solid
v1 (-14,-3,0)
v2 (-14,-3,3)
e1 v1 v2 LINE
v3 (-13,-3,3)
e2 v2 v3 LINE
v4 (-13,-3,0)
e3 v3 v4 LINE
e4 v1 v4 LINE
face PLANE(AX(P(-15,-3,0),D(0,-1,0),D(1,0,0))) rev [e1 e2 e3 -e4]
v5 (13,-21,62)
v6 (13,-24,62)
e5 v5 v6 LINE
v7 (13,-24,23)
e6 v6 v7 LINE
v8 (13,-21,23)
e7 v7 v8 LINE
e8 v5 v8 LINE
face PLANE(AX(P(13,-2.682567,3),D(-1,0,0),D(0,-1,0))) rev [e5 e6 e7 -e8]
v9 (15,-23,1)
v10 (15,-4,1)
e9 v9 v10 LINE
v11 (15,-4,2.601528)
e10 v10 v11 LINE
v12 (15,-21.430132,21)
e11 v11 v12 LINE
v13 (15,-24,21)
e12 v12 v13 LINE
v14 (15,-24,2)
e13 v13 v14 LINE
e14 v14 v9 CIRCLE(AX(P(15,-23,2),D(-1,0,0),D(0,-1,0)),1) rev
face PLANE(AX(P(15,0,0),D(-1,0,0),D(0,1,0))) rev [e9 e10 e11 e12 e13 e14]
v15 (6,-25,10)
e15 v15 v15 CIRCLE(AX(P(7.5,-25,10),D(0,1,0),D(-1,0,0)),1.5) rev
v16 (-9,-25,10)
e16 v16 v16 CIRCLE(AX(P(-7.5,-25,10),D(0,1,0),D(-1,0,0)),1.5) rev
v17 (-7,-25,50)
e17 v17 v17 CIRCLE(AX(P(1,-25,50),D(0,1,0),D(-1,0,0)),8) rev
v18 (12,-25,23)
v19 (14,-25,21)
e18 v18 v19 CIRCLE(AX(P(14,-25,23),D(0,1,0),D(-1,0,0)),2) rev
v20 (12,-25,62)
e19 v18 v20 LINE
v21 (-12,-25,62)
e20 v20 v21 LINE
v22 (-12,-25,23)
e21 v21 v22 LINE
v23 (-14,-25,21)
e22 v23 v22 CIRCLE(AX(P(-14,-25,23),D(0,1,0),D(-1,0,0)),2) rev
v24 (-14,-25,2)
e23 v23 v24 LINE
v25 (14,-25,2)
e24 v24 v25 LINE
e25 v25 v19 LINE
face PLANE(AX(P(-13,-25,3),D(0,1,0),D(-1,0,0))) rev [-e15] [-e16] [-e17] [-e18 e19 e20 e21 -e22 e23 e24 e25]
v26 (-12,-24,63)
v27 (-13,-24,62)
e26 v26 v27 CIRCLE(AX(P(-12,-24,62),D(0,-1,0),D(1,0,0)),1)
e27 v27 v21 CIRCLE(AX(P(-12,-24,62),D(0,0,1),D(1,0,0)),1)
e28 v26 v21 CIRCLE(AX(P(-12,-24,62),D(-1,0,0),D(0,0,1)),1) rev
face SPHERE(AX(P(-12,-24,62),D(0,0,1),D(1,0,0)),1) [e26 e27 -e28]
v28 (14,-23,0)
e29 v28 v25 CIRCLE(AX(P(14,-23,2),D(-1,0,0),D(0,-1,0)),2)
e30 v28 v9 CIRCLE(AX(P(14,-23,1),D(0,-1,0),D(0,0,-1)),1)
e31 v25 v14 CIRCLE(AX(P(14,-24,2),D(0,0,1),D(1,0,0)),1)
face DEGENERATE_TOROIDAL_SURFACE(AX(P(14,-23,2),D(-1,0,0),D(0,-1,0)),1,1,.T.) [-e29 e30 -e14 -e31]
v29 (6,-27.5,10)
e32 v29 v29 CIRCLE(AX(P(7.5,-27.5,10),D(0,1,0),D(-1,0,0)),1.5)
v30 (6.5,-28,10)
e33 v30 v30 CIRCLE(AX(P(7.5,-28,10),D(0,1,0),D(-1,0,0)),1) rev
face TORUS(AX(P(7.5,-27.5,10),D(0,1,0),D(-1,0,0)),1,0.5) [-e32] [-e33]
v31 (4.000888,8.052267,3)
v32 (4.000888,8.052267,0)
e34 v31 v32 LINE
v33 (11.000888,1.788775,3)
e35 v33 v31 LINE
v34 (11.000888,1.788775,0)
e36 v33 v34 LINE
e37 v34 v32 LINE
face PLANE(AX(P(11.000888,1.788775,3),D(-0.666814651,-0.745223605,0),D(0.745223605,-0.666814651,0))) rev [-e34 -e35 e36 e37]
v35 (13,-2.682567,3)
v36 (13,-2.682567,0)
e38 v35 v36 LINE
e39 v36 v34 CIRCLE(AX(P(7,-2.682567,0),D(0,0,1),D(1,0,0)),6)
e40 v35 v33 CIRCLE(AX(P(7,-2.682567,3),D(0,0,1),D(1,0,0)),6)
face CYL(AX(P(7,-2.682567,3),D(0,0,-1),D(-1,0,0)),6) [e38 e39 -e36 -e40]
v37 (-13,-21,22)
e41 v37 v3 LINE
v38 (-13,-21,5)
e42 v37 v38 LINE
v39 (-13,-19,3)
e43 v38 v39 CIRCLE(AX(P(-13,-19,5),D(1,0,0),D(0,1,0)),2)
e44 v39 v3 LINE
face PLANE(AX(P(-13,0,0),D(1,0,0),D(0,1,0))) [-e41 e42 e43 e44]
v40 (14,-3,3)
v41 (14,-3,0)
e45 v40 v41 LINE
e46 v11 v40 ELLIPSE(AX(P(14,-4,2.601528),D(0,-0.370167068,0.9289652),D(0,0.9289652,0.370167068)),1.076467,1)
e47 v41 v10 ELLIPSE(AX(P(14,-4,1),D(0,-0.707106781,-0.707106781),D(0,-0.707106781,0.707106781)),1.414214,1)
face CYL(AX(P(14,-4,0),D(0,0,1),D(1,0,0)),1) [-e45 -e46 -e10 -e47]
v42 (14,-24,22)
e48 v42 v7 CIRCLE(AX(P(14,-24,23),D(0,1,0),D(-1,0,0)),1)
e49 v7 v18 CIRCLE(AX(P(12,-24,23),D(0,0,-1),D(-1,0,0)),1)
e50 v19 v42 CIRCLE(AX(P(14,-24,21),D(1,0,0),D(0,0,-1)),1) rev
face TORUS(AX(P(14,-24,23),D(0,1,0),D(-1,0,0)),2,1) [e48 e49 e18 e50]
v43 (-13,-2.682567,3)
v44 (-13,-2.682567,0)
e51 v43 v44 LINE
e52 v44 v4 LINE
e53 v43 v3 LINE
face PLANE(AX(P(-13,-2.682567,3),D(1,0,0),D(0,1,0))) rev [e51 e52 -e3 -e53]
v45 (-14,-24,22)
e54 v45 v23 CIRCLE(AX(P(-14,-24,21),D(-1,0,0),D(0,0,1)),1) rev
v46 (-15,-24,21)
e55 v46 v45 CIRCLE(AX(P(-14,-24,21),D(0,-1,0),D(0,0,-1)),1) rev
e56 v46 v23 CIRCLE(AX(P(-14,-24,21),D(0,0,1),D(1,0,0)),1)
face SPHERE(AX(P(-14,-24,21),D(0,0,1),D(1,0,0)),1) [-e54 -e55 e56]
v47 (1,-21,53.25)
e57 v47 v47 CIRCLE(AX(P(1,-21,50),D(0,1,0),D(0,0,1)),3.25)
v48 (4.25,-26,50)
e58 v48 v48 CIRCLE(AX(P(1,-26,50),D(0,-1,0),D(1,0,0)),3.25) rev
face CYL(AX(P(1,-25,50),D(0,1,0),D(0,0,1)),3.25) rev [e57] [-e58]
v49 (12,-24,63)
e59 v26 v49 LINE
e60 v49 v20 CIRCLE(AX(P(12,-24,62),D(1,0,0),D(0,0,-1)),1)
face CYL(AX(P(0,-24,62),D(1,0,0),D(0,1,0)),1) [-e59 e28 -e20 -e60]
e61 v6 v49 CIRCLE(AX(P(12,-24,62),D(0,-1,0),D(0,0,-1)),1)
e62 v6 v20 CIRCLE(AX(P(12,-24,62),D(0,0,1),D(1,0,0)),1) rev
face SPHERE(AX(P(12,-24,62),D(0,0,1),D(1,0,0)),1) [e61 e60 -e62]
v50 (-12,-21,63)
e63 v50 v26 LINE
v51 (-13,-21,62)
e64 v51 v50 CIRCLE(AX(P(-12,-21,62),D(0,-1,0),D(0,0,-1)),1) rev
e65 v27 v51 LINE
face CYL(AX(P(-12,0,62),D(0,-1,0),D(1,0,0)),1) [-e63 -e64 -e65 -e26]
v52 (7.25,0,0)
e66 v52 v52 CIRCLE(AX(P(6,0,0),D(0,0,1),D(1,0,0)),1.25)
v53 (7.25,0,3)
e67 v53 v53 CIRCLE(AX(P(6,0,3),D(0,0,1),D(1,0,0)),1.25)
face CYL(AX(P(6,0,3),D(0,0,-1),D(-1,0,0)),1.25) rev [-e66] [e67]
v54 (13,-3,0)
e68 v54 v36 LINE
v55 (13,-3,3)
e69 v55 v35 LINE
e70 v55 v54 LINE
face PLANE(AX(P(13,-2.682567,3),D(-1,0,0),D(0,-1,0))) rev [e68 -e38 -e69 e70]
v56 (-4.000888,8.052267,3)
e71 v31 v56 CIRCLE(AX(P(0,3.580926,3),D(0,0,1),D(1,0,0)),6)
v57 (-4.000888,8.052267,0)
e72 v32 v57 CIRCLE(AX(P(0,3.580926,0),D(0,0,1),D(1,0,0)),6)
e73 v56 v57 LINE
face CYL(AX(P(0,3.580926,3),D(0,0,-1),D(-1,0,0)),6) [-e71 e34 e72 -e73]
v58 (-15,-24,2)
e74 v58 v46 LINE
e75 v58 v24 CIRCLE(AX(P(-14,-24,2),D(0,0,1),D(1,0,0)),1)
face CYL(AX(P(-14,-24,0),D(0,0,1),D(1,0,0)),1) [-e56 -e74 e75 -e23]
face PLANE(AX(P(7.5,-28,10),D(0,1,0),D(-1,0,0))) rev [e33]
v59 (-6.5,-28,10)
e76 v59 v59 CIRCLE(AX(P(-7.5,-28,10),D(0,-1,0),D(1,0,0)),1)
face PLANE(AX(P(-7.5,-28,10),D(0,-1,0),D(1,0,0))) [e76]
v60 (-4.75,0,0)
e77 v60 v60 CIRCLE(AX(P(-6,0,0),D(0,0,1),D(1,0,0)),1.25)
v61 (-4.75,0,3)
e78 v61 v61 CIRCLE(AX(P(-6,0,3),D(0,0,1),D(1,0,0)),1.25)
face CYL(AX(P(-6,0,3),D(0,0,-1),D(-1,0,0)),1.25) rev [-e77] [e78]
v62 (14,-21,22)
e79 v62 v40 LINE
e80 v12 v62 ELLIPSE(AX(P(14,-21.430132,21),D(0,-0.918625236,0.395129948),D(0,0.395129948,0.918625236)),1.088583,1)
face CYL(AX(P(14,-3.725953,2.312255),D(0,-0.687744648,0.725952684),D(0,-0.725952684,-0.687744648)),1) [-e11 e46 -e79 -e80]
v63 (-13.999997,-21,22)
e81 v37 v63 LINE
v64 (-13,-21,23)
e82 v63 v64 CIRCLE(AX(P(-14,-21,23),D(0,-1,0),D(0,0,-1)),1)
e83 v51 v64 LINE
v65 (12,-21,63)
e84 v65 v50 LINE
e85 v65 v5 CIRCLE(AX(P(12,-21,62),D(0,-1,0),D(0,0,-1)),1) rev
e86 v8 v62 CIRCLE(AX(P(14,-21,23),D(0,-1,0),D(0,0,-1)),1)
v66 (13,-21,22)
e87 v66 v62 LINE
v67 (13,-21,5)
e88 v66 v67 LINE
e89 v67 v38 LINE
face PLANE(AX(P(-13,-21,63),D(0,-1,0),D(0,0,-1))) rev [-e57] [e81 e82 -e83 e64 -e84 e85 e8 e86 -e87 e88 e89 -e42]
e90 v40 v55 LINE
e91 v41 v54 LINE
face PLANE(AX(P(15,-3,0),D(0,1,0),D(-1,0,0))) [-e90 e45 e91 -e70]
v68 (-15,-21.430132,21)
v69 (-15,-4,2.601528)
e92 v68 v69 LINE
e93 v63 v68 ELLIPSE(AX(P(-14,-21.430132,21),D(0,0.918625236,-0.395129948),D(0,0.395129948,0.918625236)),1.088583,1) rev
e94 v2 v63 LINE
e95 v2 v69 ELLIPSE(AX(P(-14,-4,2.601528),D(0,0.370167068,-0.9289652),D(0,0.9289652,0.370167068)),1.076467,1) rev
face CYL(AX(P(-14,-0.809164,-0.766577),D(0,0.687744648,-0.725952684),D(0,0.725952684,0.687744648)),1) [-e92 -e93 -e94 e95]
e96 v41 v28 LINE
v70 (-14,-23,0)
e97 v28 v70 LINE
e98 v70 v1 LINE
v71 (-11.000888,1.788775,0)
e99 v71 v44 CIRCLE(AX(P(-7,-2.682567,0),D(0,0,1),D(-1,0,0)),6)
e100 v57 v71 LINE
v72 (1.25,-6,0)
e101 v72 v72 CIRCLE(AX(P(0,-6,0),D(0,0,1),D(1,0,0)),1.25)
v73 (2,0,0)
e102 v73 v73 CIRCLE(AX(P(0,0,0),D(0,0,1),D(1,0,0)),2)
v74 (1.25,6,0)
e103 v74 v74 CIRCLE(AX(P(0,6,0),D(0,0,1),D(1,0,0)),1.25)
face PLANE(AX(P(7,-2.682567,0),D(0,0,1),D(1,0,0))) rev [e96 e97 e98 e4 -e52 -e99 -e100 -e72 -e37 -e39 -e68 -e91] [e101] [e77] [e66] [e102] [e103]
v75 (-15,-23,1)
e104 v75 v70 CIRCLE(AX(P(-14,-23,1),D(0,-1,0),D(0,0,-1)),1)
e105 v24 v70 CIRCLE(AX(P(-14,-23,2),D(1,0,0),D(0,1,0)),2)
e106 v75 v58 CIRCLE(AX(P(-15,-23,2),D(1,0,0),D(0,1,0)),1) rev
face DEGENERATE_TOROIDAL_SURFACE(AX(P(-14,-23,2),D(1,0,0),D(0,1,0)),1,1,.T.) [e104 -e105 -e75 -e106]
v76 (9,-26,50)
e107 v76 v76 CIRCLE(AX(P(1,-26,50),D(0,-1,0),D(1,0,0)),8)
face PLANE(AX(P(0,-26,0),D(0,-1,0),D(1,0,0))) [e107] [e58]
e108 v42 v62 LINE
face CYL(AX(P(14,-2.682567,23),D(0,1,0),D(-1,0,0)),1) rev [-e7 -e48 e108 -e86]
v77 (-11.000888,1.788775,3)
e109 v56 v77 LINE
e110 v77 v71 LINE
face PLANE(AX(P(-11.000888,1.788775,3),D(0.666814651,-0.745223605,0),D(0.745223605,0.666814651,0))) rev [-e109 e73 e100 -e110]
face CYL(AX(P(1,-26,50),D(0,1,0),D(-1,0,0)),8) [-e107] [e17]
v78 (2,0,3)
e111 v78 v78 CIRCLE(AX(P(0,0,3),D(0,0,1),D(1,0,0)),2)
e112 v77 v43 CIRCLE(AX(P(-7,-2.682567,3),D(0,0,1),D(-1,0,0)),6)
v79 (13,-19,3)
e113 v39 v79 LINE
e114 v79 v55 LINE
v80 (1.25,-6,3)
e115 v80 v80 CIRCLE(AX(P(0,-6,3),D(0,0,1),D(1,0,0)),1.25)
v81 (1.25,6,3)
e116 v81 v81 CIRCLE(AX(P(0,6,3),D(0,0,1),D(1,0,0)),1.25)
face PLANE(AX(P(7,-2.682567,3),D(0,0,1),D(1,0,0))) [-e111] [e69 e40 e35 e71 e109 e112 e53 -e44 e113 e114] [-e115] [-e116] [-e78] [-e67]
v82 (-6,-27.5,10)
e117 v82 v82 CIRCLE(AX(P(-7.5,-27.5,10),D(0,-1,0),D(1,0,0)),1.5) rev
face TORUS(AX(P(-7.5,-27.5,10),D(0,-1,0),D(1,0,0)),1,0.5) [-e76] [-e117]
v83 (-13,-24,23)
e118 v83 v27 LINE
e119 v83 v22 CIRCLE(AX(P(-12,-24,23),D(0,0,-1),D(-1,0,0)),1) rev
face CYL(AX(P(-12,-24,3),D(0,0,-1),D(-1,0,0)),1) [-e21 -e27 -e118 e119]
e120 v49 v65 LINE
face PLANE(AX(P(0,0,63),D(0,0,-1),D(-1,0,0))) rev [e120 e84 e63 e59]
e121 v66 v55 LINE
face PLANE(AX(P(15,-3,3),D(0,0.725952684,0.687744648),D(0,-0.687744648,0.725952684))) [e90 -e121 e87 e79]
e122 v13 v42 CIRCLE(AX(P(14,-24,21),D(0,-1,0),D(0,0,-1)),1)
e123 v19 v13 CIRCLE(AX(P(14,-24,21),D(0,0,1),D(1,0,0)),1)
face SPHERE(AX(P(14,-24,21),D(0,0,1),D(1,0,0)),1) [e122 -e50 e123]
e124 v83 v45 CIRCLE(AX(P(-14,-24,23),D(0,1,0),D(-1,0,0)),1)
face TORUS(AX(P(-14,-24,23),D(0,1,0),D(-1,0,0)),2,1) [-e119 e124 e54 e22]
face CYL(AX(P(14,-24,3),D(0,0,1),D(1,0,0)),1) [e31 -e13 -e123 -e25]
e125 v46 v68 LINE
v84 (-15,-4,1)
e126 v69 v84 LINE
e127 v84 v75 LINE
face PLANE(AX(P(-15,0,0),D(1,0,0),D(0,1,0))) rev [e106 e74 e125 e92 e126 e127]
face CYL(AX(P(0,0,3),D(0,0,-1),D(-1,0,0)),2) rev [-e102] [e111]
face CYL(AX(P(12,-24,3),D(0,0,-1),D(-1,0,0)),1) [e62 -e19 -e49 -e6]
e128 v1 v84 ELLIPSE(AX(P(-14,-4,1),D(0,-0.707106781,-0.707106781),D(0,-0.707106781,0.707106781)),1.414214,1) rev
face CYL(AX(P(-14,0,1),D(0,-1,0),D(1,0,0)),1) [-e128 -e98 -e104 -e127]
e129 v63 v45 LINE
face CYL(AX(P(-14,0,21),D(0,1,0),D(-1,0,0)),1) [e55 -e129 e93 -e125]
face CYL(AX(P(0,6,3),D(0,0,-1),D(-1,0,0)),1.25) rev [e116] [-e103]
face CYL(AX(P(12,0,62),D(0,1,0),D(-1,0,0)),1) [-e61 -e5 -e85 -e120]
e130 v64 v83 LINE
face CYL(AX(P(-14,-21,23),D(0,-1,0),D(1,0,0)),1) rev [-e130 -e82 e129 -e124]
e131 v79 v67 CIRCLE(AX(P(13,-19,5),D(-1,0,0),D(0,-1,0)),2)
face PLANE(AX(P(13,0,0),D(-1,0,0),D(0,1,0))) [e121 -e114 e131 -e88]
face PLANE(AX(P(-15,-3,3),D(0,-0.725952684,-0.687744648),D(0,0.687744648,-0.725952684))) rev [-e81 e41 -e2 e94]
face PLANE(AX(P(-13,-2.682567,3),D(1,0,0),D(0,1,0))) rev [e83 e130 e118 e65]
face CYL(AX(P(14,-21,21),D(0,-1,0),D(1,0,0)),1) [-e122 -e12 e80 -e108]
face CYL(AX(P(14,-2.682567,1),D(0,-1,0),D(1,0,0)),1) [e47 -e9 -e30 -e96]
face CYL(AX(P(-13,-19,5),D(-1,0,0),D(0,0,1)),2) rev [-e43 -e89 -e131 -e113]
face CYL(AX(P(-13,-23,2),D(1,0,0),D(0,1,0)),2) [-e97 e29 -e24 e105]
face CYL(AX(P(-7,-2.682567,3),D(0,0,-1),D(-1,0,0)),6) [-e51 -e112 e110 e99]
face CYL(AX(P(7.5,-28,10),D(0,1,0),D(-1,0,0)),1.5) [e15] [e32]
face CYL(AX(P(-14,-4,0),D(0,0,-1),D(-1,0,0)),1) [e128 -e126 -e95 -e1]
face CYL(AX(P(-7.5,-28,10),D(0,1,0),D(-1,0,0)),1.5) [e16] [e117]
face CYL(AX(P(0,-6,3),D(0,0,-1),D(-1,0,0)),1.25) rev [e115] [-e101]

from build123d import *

# Parameters (mm, degrees)
SKETCH1_R           = 2
SKETCH1_R_2         = 1.25
BOSS_EXTRUDE1_DEPTH = 3
SKETCH2_W           = 26
SKETCH2_H           = 4
BOSS_EXTRUDE2_DEPTH = 60
SKETCH3_R           = 3.25
CUT_EXTRUDE1_DEPTH  = 72.226350639
SKETCH4_R           = 8
SKETCH4_R_2         = 3.25
BOSS_EXTRUDE3_DEPTH = 1
SKETCH5_R           = 1.5
BOSS_EXTRUDE4_DEPTH = 3
BOSS_EXTRUDE5_DEPTH = 2
FILLET1_R           = 2
FILLET2_R           = 1
FILLET3_R           = 0.5


# Some blends are built 0.0001 mm under size
with BuildPart() as part:
    # Sketch1 → Boss-Extrude1 (new body)
    with BuildSketch(Plane.XY):
        with BuildLine():
            Line((-13, -2.68256679), (-13, -25))
            Line((-13, -25), (13, -25))
            Line((13, -25), (13, -2.68256679))
            ThreePointArc((13, -2.68256679), (12.477468733, -0.233620837), (11.000887907, 1.788774838))
            Line((11.000887907, 1.788774838), (4.000887907, 8.052267471))
            ThreePointArc((4.000887907, 8.052267471), (0, 9.580925842), (-4.000887907, 8.052267471))
            Line((-4.000887907, 8.052267471), (-11.000887907, 1.788774838))
            ThreePointArc((-11.000887907, 1.788774838), (-12.477468733, -0.233620837), (-13, -2.68256679))
        make_face()
        Circle(SKETCH1_R, mode=Mode.SUBTRACT)
        with Locations((-6, 0)):
            Circle(SKETCH1_R_2, mode=Mode.SUBTRACT)
        with Locations((0, 6)):
            Circle(SKETCH1_R_2, mode=Mode.SUBTRACT)
        with Locations((6, 0)):
            Circle(SKETCH1_R_2, mode=Mode.SUBTRACT)
        with Locations((0, -6)):
            Circle(SKETCH1_R_2, mode=Mode.SUBTRACT)
    extrude(amount=BOSS_EXTRUDE1_DEPTH)

    # Sketch2 → Boss-Extrude2 (add)
    with BuildSketch(Plane.XY.offset(3)):
        with Locations((0, -23)):
            Rectangle(SKETCH2_W, SKETCH2_H)
    extrude(amount=BOSS_EXTRUDE2_DEPTH)

    # Sketch3 → Cut-Extrude1 (cut, through all)
    with BuildSketch(Plane(origin=(0, -21, 0), x_dir=(1, 0, 0), z_dir=(0, 1, 0))):
        with Locations(Location((1, -50, 0), (0, 0, 270))):
            Circle(SKETCH3_R)
    extrude(amount=-CUT_EXTRUDE1_DEPTH, mode=Mode.SUBTRACT)

    # Sketch4 → Boss-Extrude3 (add)
    with BuildSketch(Plane.XZ.offset(25)):
        with Locations(Location((1, 50, 0), (0, 0, 180))):
            Circle(SKETCH4_R)
        with Locations(Location((1, 50, 0), (0, 0, 90))):
            Circle(SKETCH4_R_2, mode=Mode.SUBTRACT)
    extrude(amount=BOSS_EXTRUDE3_DEPTH)

    # Sketch5 → Boss-Extrude4 (add)
    with BuildSketch(Plane.XZ.offset(25)):
        with Locations(Location((-7.5, 10, 0), (0, 0, 180))):
            Circle(SKETCH5_R)
        with Locations(Location((7.5, 10, 0), (0, 0, 180))):
            Circle(SKETCH5_R)
    extrude(amount=BOSS_EXTRUDE4_DEPTH)

    # Sketch6 → Boss-Extrude5 (add)
    with BuildSketch(Plane.ZY.offset(13)):
        Polygon((0, -3), (3, -3), (22, -21), (22, -25), (0, -25), align=None)
    boss_extrude5 = extrude(amount=BOSS_EXTRUDE5_DEPTH)

    # Mirror1: Boss-Extrude5 across plane
    add(boss_extrude5.mirror(Plane(origin=(0, 0, 0), x_dir=(0, 0, 1), z_dir=(1, 0, 0))))

    # Fillet1
    fillet1_edges = [part.edges().sort_by_distance(p)[0] for p in [
        (0, -25, 0),
        (0, -21, 3),
    ]]
    fillet(fillet1_edges, radius=FILLET1_R)

    # Fillet2
    # the kernel refuses this fillet: 1 mm, written as the material it adds along each edge
    with BuildSketch(Plane(origin=(13, -21, 22), x_dir=(1, 0, 0), z_dir=(0, -1, 0)), Plane(origin=(-13, -21, 22), x_dir=(0, 0, 1), z_dir=(0, -1, 0))) as fillet2_piece_1:
        with BuildLine():
            CenterArc((FILLET2_R, FILLET2_R), FILLET2_R, 180, 90)
            Line((0, FILLET2_R), (-FILLET2_R * 0.02, FILLET2_R))
            Line((-FILLET2_R * 0.02, FILLET2_R), (-FILLET2_R * 0.02, -FILLET2_R * 0.02))
            Line((-FILLET2_R * 0.02, -FILLET2_R * 0.02), (FILLET2_R, -FILLET2_R * 0.02))
            Line((FILLET2_R, -FILLET2_R * 0.02), (FILLET2_R, 0))
        make_face()
    extrude(amount=4)
    fillet2_2_edges = [part.edges().sort_by_distance(p)[0] for p in [
        (15, -13, 0),
        (15, -3, 1.5),
        (15, -12, 12.5),
        (15, -23, 22),
        (15, -25, 12),
        (-15, -25, 12),
        (15, -24.414213562, 0.585786438),
        (-15, -24.414213562, 0.585786438),
        (-13, -23, 63),
        (0, -25, 63),
        (13, -23, 63),
        (-15, -13, 0),
        (-15, -23, 22),
        (-15, -12, 12.5),
        (-15, -3, 1.5),
    ]]
    fillet(fillet2_2_edges, radius=FILLET2_R - 0.0001)  # a hair under: the kernel refuses the full size
    # the kernel refuses this fillet: 1 mm, written as the material it takes off along each edge
    with BuildSketch(Plane(origin=(-15, -24, 21), x_dir=(0, -1, 0), z_dir=(0, 0, -1))) as fillet2_3_piece_1:
        with BuildLine():
            CenterArc((0.0001, -0.9999), 0.9999, 0, 90)
            Line((1, -0.9999), (1, 0))
            Line((1, 0), (0.0001, 0))
        make_face()
    revolve(axis=Axis((-15, -24, 21), (-1, 0, 0)), revolution_arc=90, mode=Mode.SUBTRACT)
    with BuildSketch(Plane(origin=(12, -24, 63), x_dir=(0, -1, 0), z_dir=(-1, 0, 0))) as fillet2_3_piece_2:
        with BuildLine():
            CenterArc((0.0001, -0.9999), 0.9999, 0, 90)
            Line((1, -0.9999), (1, 0))
            Line((1, 0), (0.0001, 0))
        make_face()
    revolve(axis=Axis((12, -24, 63), (0, 0, 1)), revolution_arc=90, mode=Mode.SUBTRACT)
    with BuildSketch(Plane(origin=(-12, -24, 63), x_dir=(-1, 0, 0), z_dir=(0, 1, 0))) as fillet2_3_piece_3:
        with BuildLine():
            CenterArc((0.0001, -0.9999), 0.9999, 0, 90)
            Line((1, -0.9999), (1, 0))
            Line((1, 0), (0.0001, 0))
        make_face()
    revolve(axis=Axis((-12, -24, 63), (0, 0, 1)), revolution_arc=90, mode=Mode.SUBTRACT)
    with BuildSketch(Plane(origin=(15, -24, 21), x_dir=(0, 0, 1), z_dir=(0, 1, 0))) as fillet2_3_piece_4:
        with BuildLine():
            CenterArc((0.0001, -0.9999), 0.9999, 0, 90)
            Line((1, -0.9999), (1, 0))
            Line((1, 0), (0.0001, 0))
        make_face()
    revolve(axis=Axis((15, -24, 21), (1, 0, 0)), revolution_arc=90, mode=Mode.SUBTRACT)
    with BuildSketch(Plane(origin=(14, -25, 22), x_dir=(0, 0, -1), z_dir=(1, 0, 0))) as fillet2_3_piece_5:
        with BuildLine():
            CenterArc((FILLET2_R, FILLET2_R), FILLET2_R, 180, 90)
            Line((0, FILLET2_R), (-FILLET2_R * 0.02, FILLET2_R))
            Line((-FILLET2_R * 0.02, FILLET2_R), (-FILLET2_R * 0.02, -FILLET2_R * 0.02))
            Line((-FILLET2_R * 0.02, -FILLET2_R * 0.02), (FILLET2_R, -FILLET2_R * 0.02))
            Line((FILLET2_R, -FILLET2_R * 0.02), (FILLET2_R, 0))
        make_face()
    extrude(amount=1, mode=Mode.SUBTRACT)
    with BuildSketch(Plane(origin=(-13, -25, 23), x_dir=(1, 0, 0), z_dir=(0, 0, 1))) as fillet2_3_piece_6:
        with BuildLine():
            CenterArc((FILLET2_R, FILLET2_R), FILLET2_R, 180, 90)
            Line((0, FILLET2_R), (-FILLET2_R * 0.02, FILLET2_R))
            Line((-FILLET2_R * 0.02, FILLET2_R), (-FILLET2_R * 0.02, -FILLET2_R * 0.02))
            Line((-FILLET2_R * 0.02, -FILLET2_R * 0.02), (FILLET2_R, -FILLET2_R * 0.02))
            Line((FILLET2_R, -FILLET2_R * 0.02), (FILLET2_R, 0))
        make_face()
    extrude(amount=40, mode=Mode.SUBTRACT)
    with BuildSketch(Plane(origin=(13, -25, 23), x_dir=(-1, 0, 0), z_dir=(0, 0, 1))) as fillet2_3_piece_7:
        with BuildLine():
            CenterArc((FILLET2_R, -FILLET2_R), FILLET2_R, 90, 90)
            Line((0, -FILLET2_R), (-FILLET2_R * 0.02, -FILLET2_R))
            Line((-FILLET2_R * 0.02, -FILLET2_R), (-FILLET2_R * 0.02, FILLET2_R * 0.02))
            Line((-FILLET2_R * 0.02, FILLET2_R * 0.02), (FILLET2_R, FILLET2_R * 0.02))
            Line((FILLET2_R, FILLET2_R * 0.02), (FILLET2_R, 0))
        make_face()
    extrude(amount=40, mode=Mode.SUBTRACT)
    with BuildSketch(Plane(origin=(-14, -25, 22), x_dir=(0, 0, -1), z_dir=(-1, 0, 0))) as fillet2_3_piece_8:
        with BuildLine():
            CenterArc((FILLET2_R, -FILLET2_R), FILLET2_R, 90, 90)
            Line((0, -FILLET2_R), (-FILLET2_R * 0.02, -FILLET2_R))
            Line((-FILLET2_R * 0.02, -FILLET2_R), (-FILLET2_R * 0.02, FILLET2_R * 0.02))
            Line((-FILLET2_R * 0.02, FILLET2_R * 0.02), (FILLET2_R, FILLET2_R * 0.02))
            Line((FILLET2_R, FILLET2_R * 0.02), (FILLET2_R, 0))
        make_face()
    extrude(amount=1, mode=Mode.SUBTRACT)
    with BuildSketch(Plane(origin=(-14, -25, 23), x_dir=(1, 0, 0), z_dir=(0, 0, 1))) as fillet2_3_piece_9:
        with BuildLine():
            CenterArc((1 + FILLET2_R, FILLET2_R), FILLET2_R, 180, 90)
            Line((1 + FILLET2_R, 0), (1 + FILLET2_R, -FILLET2_R * 0.02))
            Line((1 + FILLET2_R, -FILLET2_R * 0.02), (1 - FILLET2_R * 0.02, -FILLET2_R * 0.02))
            Line((1 - FILLET2_R * 0.02, -FILLET2_R * 0.02), (1 - FILLET2_R * 0.02, FILLET2_R))
            Line((1 - FILLET2_R * 0.02, FILLET2_R), (1, FILLET2_R))
        make_face()
    revolve(axis=Axis((-14, -25, 23), (0, 1, 0)), revolution_arc=90, mode=Mode.SUBTRACT)
    with BuildSketch(Plane(origin=(14, -25, 23), x_dir=(0, 0, -1), z_dir=(1, 0, 0))) as fillet2_3_piece_10:
        with BuildLine():
            CenterArc((1 + FILLET2_R, FILLET2_R), FILLET2_R, 180, 90)
            Line((1 + FILLET2_R, 0), (1 + FILLET2_R, -FILLET2_R * 0.02))
            Line((1 + FILLET2_R, -FILLET2_R * 0.02), (1 - FILLET2_R * 0.02, -FILLET2_R * 0.02))
            Line((1 - FILLET2_R * 0.02, -FILLET2_R * 0.02), (1 - FILLET2_R * 0.02, FILLET2_R))
            Line((1 - FILLET2_R * 0.02, FILLET2_R), (1, FILLET2_R))
        make_face()
    revolve(axis=Axis((14, -25, 23), (0, 1, 0)), revolution_arc=90, mode=Mode.SUBTRACT)

    # Fillet3
    fillet3_edges = [part.edges().sort_by_distance(p)[0] for p in [
        (-6, -28, 10),
        (9, -28, 10),
    ]]
    fillet(fillet3_edges, radius=FILLET3_R)


solid = part.part
